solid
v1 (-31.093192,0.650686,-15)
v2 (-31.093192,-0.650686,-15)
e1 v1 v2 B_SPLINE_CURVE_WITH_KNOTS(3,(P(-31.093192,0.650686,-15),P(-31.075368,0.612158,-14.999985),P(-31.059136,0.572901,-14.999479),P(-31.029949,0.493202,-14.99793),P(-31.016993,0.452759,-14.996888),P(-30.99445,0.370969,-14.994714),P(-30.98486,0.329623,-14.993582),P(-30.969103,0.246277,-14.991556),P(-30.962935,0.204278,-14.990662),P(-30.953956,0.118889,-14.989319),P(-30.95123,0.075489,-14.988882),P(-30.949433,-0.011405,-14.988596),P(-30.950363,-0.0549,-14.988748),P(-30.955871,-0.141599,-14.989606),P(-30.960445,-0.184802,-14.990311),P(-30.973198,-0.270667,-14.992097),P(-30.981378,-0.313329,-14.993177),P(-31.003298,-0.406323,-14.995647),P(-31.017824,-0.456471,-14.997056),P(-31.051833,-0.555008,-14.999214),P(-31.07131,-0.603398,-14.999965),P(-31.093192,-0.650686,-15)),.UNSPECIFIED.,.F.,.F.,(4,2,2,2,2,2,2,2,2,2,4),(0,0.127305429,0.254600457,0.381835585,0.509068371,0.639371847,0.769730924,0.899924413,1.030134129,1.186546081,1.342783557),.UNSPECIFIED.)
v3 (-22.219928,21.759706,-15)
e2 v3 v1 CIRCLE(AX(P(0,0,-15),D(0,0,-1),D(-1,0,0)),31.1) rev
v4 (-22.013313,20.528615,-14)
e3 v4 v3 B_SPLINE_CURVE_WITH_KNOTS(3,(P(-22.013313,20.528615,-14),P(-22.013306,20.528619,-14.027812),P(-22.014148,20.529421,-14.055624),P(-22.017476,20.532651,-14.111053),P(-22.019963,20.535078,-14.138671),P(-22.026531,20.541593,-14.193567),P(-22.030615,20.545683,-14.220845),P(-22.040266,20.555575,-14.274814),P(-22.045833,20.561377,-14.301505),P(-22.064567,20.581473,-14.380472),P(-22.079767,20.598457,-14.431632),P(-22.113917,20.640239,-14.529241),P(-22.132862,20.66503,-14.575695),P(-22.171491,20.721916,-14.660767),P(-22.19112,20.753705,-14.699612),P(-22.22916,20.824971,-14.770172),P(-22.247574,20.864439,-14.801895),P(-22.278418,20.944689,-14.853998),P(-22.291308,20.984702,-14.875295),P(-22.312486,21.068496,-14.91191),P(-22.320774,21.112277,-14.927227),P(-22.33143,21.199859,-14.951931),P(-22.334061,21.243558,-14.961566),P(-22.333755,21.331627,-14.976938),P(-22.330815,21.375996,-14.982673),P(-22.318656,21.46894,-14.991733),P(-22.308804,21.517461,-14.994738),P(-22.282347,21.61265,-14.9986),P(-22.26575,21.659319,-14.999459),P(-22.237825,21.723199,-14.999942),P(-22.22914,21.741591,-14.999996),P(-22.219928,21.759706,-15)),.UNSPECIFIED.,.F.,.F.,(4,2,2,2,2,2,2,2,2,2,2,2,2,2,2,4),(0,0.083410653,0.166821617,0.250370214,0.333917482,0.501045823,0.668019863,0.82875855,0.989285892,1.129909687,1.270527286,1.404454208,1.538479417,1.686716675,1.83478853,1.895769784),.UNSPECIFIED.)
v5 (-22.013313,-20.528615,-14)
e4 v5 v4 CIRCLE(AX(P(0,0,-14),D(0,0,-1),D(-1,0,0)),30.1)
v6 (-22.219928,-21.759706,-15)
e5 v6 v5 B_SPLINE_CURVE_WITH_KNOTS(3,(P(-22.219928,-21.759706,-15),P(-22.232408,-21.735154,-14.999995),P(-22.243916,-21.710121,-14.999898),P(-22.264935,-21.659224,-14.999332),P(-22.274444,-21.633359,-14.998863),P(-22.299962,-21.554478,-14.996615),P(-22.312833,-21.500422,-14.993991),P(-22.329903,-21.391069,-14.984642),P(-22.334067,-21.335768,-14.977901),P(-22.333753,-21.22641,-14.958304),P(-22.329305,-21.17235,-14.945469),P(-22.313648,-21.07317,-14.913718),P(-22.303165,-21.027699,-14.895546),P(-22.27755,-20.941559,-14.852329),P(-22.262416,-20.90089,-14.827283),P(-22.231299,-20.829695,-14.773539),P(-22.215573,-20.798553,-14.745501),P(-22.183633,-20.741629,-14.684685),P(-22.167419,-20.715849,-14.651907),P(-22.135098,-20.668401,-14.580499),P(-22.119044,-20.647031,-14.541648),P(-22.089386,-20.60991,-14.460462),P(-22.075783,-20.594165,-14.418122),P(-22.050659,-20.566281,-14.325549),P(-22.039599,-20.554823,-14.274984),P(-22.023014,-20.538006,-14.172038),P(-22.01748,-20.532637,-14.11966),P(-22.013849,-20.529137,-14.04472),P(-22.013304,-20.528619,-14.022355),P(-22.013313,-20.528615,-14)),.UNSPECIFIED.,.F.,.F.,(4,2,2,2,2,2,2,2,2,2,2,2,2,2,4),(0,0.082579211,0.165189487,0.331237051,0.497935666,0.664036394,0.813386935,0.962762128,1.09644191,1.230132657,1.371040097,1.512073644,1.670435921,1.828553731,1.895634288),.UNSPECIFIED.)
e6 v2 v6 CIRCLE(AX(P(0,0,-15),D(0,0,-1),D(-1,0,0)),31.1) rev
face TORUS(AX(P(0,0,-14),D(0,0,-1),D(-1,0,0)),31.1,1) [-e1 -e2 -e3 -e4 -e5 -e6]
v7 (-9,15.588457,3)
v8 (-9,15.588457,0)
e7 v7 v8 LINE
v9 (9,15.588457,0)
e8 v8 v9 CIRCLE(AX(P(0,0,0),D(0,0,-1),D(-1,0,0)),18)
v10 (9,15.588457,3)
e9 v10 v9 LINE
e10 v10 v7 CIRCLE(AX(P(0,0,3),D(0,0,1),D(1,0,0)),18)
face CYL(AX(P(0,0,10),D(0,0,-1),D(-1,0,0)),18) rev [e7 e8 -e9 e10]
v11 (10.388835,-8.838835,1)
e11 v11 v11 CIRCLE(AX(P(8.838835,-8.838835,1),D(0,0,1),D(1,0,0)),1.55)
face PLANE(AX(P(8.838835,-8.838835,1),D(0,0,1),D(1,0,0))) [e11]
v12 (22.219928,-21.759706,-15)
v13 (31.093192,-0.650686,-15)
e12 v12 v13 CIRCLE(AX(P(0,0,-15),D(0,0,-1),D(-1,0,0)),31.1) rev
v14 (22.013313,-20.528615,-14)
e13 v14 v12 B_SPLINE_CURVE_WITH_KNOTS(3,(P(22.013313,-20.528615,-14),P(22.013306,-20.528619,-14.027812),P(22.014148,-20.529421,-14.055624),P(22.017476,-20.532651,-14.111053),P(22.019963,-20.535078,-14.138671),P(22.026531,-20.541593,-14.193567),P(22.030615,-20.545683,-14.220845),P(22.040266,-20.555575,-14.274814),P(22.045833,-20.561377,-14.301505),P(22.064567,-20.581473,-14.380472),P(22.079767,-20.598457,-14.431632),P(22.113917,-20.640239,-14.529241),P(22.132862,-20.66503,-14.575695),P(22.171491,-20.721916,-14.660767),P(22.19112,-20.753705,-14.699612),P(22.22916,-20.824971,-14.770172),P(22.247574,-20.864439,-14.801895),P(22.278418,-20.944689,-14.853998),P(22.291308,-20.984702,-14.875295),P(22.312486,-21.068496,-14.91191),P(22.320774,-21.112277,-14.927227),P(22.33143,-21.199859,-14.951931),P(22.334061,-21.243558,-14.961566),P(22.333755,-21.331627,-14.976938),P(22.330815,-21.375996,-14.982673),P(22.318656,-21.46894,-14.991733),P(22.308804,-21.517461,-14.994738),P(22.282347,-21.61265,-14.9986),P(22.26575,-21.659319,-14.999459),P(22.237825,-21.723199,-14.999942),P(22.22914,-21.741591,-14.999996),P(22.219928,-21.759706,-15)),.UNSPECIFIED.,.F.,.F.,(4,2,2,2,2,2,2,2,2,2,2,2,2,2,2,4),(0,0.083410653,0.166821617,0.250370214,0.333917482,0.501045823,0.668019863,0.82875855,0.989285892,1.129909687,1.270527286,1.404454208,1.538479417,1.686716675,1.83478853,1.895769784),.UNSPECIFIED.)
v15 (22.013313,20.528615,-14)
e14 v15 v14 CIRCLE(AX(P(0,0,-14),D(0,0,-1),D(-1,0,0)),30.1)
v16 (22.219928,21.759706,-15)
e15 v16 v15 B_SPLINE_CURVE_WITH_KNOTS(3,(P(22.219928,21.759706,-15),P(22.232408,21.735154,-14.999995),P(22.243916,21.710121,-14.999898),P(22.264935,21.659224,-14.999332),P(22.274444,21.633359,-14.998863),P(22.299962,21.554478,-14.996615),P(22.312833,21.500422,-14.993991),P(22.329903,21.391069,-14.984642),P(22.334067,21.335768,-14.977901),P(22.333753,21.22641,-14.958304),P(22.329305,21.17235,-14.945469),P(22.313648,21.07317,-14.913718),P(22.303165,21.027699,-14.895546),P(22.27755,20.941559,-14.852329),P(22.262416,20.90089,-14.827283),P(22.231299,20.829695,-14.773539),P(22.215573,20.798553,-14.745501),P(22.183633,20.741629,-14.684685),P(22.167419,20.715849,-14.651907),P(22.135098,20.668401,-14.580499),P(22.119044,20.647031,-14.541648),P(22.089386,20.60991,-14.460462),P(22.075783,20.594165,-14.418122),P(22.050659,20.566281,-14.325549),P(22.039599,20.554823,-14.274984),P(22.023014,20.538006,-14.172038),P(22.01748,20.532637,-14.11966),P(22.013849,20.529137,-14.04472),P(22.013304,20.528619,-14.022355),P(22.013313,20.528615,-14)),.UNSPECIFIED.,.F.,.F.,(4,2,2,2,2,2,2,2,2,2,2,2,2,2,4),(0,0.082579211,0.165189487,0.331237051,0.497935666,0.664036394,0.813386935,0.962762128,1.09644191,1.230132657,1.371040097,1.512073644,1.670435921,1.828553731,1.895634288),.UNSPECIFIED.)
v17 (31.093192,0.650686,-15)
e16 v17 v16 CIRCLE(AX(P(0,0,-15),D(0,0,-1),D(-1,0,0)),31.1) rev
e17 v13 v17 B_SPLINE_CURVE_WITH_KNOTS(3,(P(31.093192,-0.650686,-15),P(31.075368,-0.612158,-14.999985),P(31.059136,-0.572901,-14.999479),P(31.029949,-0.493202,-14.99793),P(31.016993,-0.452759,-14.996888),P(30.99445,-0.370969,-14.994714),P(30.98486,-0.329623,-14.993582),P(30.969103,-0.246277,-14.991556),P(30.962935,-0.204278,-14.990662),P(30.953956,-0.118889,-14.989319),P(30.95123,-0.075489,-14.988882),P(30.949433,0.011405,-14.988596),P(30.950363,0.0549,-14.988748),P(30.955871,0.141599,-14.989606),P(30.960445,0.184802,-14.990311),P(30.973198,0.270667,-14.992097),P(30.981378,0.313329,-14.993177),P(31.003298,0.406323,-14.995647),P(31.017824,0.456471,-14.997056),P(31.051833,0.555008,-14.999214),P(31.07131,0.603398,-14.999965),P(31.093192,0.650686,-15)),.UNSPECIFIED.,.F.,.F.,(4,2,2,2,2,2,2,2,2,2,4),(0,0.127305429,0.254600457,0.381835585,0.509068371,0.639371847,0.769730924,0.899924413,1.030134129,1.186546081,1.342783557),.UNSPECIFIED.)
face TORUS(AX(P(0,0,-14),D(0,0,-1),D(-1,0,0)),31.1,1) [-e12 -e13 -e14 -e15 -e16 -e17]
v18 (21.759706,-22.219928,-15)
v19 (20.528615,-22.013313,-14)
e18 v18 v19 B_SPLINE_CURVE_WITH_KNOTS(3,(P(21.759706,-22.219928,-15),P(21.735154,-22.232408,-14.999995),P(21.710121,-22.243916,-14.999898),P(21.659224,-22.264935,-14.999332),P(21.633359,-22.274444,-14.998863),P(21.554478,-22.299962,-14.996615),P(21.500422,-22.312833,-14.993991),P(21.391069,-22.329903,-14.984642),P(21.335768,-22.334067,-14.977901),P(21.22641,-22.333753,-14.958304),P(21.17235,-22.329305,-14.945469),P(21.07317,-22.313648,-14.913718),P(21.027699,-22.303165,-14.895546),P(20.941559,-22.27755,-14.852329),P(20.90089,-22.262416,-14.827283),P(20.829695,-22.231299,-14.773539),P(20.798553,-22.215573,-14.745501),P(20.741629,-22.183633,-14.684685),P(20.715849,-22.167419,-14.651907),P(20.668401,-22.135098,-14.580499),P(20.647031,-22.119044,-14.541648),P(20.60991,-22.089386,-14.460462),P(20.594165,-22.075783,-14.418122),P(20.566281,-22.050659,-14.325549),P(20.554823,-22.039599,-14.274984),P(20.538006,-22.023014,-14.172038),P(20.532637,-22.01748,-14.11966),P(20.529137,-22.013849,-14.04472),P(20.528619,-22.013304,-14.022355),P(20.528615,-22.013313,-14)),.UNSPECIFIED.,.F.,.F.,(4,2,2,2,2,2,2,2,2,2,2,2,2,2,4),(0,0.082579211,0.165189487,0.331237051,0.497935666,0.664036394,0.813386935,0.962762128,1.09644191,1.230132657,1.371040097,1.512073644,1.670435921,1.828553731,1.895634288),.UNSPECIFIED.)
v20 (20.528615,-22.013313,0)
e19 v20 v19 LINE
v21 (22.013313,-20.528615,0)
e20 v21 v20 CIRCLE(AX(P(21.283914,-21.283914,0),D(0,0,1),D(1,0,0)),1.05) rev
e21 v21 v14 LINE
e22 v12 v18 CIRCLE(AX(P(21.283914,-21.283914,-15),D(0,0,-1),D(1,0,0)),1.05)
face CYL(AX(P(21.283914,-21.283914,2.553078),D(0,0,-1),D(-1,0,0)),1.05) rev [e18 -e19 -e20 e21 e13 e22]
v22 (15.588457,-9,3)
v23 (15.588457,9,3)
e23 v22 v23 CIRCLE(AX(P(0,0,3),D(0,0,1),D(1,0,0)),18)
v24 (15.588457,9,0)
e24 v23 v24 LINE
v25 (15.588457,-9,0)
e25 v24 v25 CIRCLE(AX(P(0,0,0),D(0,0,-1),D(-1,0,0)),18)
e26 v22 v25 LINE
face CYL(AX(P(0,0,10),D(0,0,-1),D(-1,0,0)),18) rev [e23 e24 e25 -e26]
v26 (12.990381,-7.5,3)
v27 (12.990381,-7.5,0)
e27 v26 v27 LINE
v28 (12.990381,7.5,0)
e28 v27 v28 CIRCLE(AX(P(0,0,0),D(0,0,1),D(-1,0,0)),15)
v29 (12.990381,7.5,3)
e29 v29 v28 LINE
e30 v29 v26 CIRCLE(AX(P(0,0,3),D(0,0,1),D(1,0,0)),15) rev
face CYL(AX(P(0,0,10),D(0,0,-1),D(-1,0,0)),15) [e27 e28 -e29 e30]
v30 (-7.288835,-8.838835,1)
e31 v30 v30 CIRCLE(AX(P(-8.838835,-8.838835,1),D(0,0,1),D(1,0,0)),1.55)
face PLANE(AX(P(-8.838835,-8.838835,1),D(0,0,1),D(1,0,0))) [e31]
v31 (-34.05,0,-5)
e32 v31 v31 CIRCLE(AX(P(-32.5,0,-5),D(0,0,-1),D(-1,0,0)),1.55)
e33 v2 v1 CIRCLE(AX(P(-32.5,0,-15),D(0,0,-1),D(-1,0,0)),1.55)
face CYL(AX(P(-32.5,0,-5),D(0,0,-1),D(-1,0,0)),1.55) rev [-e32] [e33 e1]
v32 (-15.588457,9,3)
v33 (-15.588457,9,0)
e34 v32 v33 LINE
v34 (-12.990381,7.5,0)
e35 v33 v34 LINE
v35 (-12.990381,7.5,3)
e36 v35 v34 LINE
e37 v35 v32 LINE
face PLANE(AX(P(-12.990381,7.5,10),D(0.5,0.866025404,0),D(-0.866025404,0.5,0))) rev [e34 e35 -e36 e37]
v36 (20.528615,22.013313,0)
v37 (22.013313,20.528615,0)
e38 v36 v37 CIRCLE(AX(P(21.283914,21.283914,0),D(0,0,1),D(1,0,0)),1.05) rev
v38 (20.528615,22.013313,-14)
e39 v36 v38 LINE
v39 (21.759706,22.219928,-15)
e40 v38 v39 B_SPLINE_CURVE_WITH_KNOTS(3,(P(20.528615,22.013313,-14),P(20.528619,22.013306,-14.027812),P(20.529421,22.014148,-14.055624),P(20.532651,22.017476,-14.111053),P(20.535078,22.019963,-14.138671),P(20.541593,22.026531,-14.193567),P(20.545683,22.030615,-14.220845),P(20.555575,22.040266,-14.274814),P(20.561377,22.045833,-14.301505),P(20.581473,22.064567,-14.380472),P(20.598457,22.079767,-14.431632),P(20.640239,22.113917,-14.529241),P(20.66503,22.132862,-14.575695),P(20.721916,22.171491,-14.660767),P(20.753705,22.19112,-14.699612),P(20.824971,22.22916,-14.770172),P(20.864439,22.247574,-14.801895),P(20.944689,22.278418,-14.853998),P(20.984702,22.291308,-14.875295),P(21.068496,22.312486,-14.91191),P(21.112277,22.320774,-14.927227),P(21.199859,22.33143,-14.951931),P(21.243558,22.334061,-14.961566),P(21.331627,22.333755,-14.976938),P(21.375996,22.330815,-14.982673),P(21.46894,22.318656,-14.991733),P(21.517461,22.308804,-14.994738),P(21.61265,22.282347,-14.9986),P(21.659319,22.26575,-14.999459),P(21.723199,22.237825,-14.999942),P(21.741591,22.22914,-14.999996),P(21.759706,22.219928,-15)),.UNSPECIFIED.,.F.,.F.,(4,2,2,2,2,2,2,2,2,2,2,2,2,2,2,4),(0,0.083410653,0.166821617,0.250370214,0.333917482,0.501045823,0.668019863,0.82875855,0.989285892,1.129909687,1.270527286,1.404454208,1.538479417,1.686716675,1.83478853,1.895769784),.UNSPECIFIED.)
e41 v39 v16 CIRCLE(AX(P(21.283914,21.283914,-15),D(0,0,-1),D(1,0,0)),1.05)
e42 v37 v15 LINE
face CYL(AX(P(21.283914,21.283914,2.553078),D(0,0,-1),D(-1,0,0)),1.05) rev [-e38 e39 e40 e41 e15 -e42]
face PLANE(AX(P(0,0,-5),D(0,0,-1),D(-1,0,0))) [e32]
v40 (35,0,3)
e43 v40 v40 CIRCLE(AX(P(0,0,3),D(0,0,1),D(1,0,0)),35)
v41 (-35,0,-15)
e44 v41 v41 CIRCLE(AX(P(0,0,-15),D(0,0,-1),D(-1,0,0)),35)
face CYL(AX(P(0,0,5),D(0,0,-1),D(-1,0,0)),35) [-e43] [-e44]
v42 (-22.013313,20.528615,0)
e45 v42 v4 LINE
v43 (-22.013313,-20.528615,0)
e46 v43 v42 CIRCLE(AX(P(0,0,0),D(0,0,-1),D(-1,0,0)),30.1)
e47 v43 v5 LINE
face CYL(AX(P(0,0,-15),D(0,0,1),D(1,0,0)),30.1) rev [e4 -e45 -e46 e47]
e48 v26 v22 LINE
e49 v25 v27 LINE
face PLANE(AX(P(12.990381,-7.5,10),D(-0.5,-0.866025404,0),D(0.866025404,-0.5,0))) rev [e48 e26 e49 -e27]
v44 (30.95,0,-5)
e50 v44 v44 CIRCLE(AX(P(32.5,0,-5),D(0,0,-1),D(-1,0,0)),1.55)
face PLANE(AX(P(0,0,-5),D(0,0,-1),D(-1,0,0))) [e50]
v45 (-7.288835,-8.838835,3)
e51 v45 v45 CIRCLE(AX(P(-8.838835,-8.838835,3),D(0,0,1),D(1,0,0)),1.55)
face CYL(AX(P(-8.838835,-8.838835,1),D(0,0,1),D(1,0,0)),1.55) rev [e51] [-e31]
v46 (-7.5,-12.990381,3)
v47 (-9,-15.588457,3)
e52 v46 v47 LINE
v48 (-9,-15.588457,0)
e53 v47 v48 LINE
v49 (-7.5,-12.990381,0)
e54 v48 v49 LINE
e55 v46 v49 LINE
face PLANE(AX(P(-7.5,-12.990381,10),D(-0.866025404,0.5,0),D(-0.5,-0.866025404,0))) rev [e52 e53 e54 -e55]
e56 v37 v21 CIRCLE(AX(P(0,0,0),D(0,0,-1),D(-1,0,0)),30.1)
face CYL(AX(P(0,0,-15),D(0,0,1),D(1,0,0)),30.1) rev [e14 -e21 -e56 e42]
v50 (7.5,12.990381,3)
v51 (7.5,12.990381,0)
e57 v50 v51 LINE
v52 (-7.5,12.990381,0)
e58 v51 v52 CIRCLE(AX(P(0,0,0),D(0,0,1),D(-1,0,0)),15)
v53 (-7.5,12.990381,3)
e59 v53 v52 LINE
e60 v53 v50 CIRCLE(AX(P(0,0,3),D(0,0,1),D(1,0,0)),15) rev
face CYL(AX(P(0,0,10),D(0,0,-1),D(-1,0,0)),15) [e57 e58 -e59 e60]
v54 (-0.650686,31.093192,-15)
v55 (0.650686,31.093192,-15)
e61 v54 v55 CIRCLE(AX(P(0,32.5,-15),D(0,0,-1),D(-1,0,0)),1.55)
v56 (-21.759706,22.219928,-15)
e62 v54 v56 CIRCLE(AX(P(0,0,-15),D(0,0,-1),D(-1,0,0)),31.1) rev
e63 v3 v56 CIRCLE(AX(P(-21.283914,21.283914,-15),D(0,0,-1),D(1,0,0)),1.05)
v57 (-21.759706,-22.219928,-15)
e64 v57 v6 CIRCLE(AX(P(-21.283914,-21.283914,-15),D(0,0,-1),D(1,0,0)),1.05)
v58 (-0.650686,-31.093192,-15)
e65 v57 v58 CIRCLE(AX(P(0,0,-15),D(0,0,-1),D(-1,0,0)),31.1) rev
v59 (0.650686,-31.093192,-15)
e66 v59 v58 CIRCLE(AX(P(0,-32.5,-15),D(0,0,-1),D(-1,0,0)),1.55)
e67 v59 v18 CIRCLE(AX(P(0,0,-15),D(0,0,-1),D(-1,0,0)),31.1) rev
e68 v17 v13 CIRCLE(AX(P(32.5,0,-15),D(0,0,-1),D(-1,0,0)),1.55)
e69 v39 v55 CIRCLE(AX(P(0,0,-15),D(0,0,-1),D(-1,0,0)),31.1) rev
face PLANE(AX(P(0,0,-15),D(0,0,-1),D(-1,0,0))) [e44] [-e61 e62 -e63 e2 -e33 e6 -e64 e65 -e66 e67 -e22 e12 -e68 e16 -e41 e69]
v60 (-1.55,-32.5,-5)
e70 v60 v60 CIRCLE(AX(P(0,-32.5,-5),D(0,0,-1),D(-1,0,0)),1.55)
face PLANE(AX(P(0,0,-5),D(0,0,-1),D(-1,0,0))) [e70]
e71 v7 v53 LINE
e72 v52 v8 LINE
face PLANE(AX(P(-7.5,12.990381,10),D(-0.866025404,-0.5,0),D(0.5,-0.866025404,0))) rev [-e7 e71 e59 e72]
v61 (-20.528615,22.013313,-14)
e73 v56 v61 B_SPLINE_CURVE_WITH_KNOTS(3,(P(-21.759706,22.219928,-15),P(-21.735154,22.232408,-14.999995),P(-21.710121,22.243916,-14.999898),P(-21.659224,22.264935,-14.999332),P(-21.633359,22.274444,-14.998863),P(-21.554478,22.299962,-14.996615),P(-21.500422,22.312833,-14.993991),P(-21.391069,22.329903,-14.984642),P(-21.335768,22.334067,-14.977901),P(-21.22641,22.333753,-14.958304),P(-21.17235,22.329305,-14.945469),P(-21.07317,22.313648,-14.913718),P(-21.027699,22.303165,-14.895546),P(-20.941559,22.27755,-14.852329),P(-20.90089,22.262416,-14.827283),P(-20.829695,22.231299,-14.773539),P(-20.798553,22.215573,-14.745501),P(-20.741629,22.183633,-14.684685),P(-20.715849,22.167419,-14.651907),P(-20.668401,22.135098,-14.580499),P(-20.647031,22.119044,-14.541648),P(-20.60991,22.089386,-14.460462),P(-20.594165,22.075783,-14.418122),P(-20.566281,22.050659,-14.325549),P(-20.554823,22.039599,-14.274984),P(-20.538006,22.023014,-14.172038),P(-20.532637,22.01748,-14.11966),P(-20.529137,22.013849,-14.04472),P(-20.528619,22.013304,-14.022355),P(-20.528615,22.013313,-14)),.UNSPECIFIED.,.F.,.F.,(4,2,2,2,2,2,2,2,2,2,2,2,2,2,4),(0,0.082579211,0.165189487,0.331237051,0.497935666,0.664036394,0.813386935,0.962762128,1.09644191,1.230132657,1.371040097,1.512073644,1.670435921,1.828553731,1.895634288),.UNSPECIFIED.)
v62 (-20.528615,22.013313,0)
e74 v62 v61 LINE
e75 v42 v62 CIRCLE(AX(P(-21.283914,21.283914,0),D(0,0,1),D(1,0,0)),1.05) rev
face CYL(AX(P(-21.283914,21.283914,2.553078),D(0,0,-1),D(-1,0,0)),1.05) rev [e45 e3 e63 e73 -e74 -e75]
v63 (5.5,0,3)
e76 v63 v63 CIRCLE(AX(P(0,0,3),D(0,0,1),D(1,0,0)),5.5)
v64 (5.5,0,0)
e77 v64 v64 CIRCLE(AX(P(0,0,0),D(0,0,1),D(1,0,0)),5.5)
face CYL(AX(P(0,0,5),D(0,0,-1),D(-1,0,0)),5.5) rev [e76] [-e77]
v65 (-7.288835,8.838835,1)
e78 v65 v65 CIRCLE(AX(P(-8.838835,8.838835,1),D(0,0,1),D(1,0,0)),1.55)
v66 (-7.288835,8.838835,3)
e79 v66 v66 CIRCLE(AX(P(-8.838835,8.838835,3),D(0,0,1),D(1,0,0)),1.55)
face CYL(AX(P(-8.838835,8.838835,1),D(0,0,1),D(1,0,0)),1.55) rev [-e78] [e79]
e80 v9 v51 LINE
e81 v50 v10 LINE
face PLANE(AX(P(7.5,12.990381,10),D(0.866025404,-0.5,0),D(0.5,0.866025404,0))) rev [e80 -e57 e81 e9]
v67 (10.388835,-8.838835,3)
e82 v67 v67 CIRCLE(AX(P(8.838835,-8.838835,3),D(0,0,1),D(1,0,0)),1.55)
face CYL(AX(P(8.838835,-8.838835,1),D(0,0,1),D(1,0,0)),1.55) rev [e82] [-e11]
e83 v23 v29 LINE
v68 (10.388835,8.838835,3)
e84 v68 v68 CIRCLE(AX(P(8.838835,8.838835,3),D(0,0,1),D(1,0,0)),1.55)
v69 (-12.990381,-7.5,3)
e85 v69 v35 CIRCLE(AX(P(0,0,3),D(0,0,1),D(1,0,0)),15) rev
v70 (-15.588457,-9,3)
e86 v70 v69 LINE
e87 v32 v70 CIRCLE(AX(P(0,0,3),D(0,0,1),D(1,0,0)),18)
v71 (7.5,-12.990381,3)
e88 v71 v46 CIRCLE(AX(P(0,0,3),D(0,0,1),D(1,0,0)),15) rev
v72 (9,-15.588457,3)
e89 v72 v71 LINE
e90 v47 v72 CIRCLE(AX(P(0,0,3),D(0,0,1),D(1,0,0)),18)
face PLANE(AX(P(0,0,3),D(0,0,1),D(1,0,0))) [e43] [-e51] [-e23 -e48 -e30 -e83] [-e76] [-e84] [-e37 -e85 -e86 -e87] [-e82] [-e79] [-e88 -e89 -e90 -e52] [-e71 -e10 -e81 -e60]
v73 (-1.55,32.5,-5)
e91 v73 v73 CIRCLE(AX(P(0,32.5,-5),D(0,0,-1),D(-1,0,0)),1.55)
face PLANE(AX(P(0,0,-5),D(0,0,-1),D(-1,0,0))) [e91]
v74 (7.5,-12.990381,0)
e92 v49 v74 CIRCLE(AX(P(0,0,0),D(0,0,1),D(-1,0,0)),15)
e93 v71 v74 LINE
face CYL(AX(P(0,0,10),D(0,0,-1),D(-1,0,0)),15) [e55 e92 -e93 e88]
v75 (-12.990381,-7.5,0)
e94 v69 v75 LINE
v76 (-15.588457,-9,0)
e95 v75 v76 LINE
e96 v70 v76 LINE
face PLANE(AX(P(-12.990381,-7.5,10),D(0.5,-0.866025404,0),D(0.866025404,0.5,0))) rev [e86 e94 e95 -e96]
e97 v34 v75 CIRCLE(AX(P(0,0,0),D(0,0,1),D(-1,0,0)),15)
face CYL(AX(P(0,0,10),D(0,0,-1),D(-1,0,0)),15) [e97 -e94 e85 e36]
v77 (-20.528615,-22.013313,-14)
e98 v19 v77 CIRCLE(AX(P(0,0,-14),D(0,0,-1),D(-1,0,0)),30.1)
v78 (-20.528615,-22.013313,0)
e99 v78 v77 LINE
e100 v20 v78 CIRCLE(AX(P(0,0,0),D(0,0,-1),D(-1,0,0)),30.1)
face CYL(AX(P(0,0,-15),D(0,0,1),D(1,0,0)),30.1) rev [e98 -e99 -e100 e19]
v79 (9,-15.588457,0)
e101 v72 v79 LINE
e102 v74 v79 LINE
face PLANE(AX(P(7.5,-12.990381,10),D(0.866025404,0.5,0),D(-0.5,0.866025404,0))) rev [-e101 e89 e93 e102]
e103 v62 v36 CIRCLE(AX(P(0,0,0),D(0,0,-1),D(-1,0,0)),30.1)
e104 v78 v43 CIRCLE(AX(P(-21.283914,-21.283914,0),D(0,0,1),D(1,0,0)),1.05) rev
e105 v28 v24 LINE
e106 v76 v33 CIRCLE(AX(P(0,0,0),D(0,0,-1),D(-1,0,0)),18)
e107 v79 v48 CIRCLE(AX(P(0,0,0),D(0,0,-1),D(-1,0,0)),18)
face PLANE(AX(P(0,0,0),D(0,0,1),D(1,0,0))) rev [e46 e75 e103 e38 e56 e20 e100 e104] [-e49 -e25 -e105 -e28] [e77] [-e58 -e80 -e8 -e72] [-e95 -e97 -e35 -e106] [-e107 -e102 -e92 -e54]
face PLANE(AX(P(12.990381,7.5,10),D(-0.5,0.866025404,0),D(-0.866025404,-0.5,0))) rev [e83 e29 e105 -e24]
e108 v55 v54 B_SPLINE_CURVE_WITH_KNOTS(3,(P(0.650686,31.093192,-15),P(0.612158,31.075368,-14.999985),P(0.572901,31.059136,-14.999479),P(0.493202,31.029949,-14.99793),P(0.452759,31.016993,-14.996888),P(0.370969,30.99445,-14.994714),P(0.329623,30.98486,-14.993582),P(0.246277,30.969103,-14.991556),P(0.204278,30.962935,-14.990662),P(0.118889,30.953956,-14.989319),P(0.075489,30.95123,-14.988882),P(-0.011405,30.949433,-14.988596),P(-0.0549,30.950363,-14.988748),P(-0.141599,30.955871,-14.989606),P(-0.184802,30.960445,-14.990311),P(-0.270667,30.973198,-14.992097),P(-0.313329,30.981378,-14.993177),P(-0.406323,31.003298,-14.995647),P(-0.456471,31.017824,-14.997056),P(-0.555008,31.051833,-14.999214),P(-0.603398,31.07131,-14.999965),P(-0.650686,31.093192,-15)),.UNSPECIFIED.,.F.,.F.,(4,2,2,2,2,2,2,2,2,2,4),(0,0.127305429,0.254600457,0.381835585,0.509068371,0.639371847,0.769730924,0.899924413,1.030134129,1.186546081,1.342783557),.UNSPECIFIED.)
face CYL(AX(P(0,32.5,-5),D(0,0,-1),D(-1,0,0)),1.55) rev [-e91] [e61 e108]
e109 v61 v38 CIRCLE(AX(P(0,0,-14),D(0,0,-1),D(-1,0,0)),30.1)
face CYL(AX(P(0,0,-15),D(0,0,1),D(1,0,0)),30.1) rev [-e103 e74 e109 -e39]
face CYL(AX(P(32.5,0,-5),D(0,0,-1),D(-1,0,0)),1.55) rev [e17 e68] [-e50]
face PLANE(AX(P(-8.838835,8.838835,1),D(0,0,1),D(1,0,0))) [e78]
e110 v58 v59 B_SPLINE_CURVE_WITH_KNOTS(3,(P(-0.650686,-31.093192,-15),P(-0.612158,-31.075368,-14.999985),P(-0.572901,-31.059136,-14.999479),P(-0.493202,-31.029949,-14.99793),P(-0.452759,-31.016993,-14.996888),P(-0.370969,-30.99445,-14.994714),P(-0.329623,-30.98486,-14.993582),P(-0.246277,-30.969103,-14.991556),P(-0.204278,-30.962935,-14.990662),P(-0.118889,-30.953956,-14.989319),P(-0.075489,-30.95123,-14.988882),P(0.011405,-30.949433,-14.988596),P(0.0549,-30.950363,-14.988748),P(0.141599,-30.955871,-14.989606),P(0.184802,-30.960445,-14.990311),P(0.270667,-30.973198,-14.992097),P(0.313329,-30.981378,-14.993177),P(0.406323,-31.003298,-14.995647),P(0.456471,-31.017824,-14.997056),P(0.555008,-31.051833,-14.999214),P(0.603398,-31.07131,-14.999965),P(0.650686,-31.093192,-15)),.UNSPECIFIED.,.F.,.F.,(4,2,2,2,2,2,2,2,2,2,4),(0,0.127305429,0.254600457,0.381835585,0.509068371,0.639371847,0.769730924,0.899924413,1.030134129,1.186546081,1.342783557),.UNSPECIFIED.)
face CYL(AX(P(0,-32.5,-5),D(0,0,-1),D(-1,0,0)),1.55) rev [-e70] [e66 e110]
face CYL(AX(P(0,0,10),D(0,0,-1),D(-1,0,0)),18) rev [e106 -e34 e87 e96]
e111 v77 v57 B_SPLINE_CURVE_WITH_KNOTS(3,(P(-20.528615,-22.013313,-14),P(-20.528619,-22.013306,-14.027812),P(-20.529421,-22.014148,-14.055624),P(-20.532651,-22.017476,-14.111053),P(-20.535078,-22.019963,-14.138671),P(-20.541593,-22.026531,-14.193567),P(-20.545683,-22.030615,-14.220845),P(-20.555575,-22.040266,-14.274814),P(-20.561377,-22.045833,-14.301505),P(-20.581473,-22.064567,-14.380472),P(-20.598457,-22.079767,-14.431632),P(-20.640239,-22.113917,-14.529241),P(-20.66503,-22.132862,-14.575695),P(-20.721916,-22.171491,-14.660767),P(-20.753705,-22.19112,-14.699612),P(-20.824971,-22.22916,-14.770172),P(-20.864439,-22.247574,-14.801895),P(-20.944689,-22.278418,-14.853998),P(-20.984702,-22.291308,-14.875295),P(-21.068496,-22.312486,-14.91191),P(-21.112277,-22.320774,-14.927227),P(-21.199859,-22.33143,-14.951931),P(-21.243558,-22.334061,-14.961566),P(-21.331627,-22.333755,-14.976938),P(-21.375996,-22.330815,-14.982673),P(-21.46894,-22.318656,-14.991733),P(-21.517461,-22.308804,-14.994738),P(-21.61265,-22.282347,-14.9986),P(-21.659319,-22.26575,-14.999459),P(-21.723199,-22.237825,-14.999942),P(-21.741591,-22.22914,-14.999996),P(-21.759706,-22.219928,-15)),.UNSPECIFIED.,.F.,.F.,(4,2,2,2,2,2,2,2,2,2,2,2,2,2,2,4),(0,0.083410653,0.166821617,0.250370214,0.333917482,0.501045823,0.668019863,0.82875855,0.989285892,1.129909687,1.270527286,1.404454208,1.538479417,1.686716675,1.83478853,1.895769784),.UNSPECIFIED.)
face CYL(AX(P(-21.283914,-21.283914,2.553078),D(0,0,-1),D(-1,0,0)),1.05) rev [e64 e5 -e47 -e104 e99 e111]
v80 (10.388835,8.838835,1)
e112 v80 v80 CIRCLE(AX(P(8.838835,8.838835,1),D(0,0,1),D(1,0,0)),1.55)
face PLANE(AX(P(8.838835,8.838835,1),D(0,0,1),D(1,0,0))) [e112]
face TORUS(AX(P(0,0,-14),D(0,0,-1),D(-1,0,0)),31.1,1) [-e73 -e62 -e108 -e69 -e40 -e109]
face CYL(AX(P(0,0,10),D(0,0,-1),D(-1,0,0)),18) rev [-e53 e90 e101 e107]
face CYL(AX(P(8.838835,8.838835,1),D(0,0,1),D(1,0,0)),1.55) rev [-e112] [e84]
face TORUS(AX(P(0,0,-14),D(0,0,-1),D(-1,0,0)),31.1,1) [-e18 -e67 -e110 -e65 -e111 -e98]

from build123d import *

# Parameters (mm, degrees)
SKETCH_2_R          = 35
SKETCH_2_R_2        = 5.5
EXTRUDE_1_DEPTH     = 5
EXTRUDE_START       = 15
SKETCH_3_R          = 35
SKETCH_3_R_2        = 30.1
EXTRUDE_2_DEPTH     = 15
SKETCH_4_R          = 1.55
CUT_EXTRUDE_1_DEPTH = 10
CUT_EXTRUDE_5_DEPTH = 15
FILLET_1_R          = 1
CUT_EXTRUDE_START   = -2
SKETCH_10_R         = 35
CUT_EXTRUDE_6_DEPTH = 2
CUT_EXTRUDE_7_DEPTH = 10
SKETCH5_R           = 1.55
CUT_EXTRUDE2_DEPTH  = 2


with BuildPart() as part:
    # 草图2 → 凸台-拉伸1 (new body)
    with BuildSketch(Plane.XY):
        Circle(SKETCH_2_R)
        Circle(SKETCH_2_R_2, mode=Mode.SUBTRACT)
    extrude(amount=EXTRUDE_1_DEPTH)

    # 草图3 → 凸台-拉伸2 (add)
    with BuildSketch(Plane(origin=(0, 0, 0), x_dir=(-1, 0, 0), z_dir=(0, 0, -1)).offset(EXTRUDE_START)):
        Circle(SKETCH_3_R)
        Circle(SKETCH_3_R_2, mode=Mode.SUBTRACT)
    extrude(amount=-EXTRUDE_2_DEPTH)

    # 草图4 → 切除-拉伸1 (cut)
    with BuildSketch(Plane(origin=(0, 0, -15), x_dir=(-1, 0, 0), z_dir=(0, 0, -1))):
        with Locations((0, 32.5)):
            Circle(SKETCH_4_R)
        with Locations((32.5, 0)):
            Circle(SKETCH_4_R)
        with Locations((0, -32.5)):
            Circle(SKETCH_4_R)
        with Locations((-32.5, 0)):
            Circle(SKETCH_4_R)
    extrude(amount=-CUT_EXTRUDE_1_DEPTH, mode=Mode.SUBTRACT)

    # 草图9 → 切除-拉伸5 (cut)
    with BuildSketch(Plane(origin=(0, 0, -15), x_dir=(-1, 0, 0), z_dir=(0, 0, -1))):
        with BuildLine():
            ThreePointArc((-22.013313369, 20.528615017), (-22.026376234, 22.026376234), (-20.528615017, 22.013313369))
            ThreePointArc((-20.528615017, 22.013313369), (-21.283914114, 21.283914114), (-22.013313369, 20.528615017))
        make_face()
        with BuildLine():
            ThreePointArc((20.528615017, 22.013313369), (22.026376234, 22.026376234), (22.013313369, 20.528615017))
            ThreePointArc((22.013313369, 20.528615017), (21.283914114, 21.283914114), (20.528615017, 22.013313369))
        make_face()
        with BuildLine():
            ThreePointArc((22.013313369, -20.528615017), (22.026376234, -22.026376234), (20.528615017, -22.013313369))
            ThreePointArc((20.528615017, -22.013313369), (21.283914114, -21.283914114), (22.013313369, -20.528615017))
        make_face()
        with BuildLine():
            ThreePointArc((-20.528615017, -22.013313369), (-22.026376234, -22.026376234), (-22.013313369, -20.528615017))
            ThreePointArc((-22.013313369, -20.528615017), (-21.283914114, -21.283914114), (-20.528615017, -22.013313369))
        make_face()
    extrude(amount=-CUT_EXTRUDE_5_DEPTH, mode=Mode.SUBTRACT)

    # 圆角1
    # the kernel refuses this fillet: 1 mm, written as the material it takes off along each edge
    with BuildSketch(Plane(origin=(0, 0, -15), x_dir=(-0.7403558797037455, 0.6722151228498904, 0), z_dir=(-0.6722151228498904, -0.7403558797037455, 0))) as fillet_1_piece_1:
        with BuildLine():
            CenterArc((30.1 + FILLET_1_R, -FILLET_1_R), FILLET_1_R, 90, 90)
            Line((30.1, -FILLET_1_R), (30.1, 0))
            Line((30.1, 0), (30.1 + FILLET_1_R, 0))
        make_face()
    revolve(axis=Axis((0, 0, -15), (0, 0, -1)), revolution_arc=95.523479776, mode=Mode.SUBTRACT)
    with BuildSketch(Plane(origin=(0, 0, -15), x_dir=(0.6722151228498918, 0.7403558797037441, 0), z_dir=(-0.7403558797037441, 0.6722151228498918, 0))) as fillet_1_piece_2:
        with BuildLine():
            CenterArc((30.1 + FILLET_1_R, -FILLET_1_R), FILLET_1_R, 90, 90)
            Line((30.1, -FILLET_1_R), (30.1, 0))
            Line((30.1, 0), (30.1 + FILLET_1_R, 0))
        make_face()
    revolve(axis=Axis((0, 0, -15), (0, 0, -1)), revolution_arc=95.523479776, mode=Mode.SUBTRACT)
    with BuildSketch(Plane(origin=(0, 0, -15), x_dir=(0.7403558797037453, -0.6722151228498905, 0), z_dir=(0.6722151228498905, 0.7403558797037453, 0))) as fillet_1_piece_3:
        with BuildLine():
            CenterArc((30.1 + FILLET_1_R, -FILLET_1_R), FILLET_1_R, 90, 90)
            Line((30.1, -FILLET_1_R), (30.1, 0))
            Line((30.1, 0), (30.1 + FILLET_1_R, 0))
        make_face()
    revolve(axis=Axis((0, 0, -15), (0, 0, -1)), revolution_arc=95.523479776, mode=Mode.SUBTRACT)
    with BuildSketch(Plane(origin=(0, 0, -15), x_dir=(-1, 0, 0), z_dir=(0, -1, 0))) as fillet_1_piece_4:
        with BuildLine():
            CenterArc((30.1 + FILLET_1_R, -FILLET_1_R), FILLET_1_R, 90, 90)
            Line((30.1, -FILLET_1_R), (30.1, 0))
            Line((30.1, 0), (30.1 + FILLET_1_R, 0))
        make_face()
    revolve(axis=Axis((0, 0, -15), (0, 0, -1)), revolution_arc=47.760430641, mode=Mode.SUBTRACT)
    with BuildSketch(Plane(origin=(0, 0, -15), x_dir=(-0.6722320403041436, -0.7403405189428228, 0), z_dir=(0.7403405189428228, -0.6722320403041436, 0))) as fillet_1_piece_5:
        with BuildLine():
            CenterArc((30.1 + FILLET_1_R, -FILLET_1_R), FILLET_1_R, 90, 90)
            Line((30.1, -FILLET_1_R), (30.1, 0))
            Line((30.1, 0), (30.1 + FILLET_1_R, 0))
        make_face()
    revolve(axis=Axis((0, 0, -15), (0, 0, -1)), revolution_arc=47.760430641, mode=Mode.SUBTRACT)

    # 草图10 → 切除-拉伸6 (cut)
    with BuildSketch(Plane.XY.offset(5).offset(CUT_EXTRUDE_START)):
        with Locations(Location((0, 0, 0), (0, 0, 180))):
            Circle(SKETCH_10_R)
    extrude(amount=CUT_EXTRUDE_6_DEPTH, mode=Mode.SUBTRACT)

    # 草图11 → 切除-拉伸7 (cut)
    with BuildSketch(Plane(origin=(0, 0, 0), x_dir=(-1, 0, 0), z_dir=(0, 0, -1))):
        with BuildLine():
            Line((12.990381057, 7.5), (15.588457268, 9))
            ThreePointArc((15.588457268, 9), (18, 0), (15.588457268, -9))
            Line((15.588457268, -9), (12.990381057, -7.5))
            ThreePointArc((12.990381057, -7.5), (15, 0), (12.990381057, 7.5))
        make_face()
        with BuildLine():
            Line((-7.5, 12.990381057), (-9, 15.588457268))
            ThreePointArc((-9, 15.588457268), (0, 18), (9, 15.588457268))
            Line((9, 15.588457268), (7.5, 12.990381057))
            ThreePointArc((7.5, 12.990381057), (0, 15), (-7.5, 12.990381057))
        make_face()
        with BuildLine():
            Line((7.5, -12.990381057), (9, -15.588457268))
            ThreePointArc((9, -15.588457268), (0, -18), (-9, -15.588457268))
            Line((-9, -15.588457268), (-7.5, -12.990381057))
            ThreePointArc((-7.5, -12.990381057), (0, -15), (7.5, -12.990381057))
        make_face()
        with BuildLine():
            Line((-12.990381057, -7.5), (-15.588457268, -9))
            ThreePointArc((-15.588457268, -9), (-18, 0), (-15.588457268, 9))
            Line((-15.588457268, 9), (-12.990381057, 7.5))
            ThreePointArc((-12.990381057, 7.5), (-15, 0), (-12.990381057, -7.5))
        make_face()
    extrude(amount=-CUT_EXTRUDE_7_DEPTH, mode=Mode.SUBTRACT)

    # Sketch5 → Cut-Extrude2 (cut)
    with BuildSketch(Plane.XY.offset(3)):
        with Locations((8.838834765, 8.838834765)):
            Circle(SKETCH5_R)
        with Locations((8.838834765, -8.838834765)):
            Circle(SKETCH5_R)
        with Locations((-8.838834765, -8.838834765)):
            Circle(SKETCH5_R)
        with Locations((-8.838834765, 8.838834765)):
            Circle(SKETCH5_R)
    extrude(amount=-CUT_EXTRUDE2_DEPTH, mode=Mode.SUBTRACT)


solid = part.part
